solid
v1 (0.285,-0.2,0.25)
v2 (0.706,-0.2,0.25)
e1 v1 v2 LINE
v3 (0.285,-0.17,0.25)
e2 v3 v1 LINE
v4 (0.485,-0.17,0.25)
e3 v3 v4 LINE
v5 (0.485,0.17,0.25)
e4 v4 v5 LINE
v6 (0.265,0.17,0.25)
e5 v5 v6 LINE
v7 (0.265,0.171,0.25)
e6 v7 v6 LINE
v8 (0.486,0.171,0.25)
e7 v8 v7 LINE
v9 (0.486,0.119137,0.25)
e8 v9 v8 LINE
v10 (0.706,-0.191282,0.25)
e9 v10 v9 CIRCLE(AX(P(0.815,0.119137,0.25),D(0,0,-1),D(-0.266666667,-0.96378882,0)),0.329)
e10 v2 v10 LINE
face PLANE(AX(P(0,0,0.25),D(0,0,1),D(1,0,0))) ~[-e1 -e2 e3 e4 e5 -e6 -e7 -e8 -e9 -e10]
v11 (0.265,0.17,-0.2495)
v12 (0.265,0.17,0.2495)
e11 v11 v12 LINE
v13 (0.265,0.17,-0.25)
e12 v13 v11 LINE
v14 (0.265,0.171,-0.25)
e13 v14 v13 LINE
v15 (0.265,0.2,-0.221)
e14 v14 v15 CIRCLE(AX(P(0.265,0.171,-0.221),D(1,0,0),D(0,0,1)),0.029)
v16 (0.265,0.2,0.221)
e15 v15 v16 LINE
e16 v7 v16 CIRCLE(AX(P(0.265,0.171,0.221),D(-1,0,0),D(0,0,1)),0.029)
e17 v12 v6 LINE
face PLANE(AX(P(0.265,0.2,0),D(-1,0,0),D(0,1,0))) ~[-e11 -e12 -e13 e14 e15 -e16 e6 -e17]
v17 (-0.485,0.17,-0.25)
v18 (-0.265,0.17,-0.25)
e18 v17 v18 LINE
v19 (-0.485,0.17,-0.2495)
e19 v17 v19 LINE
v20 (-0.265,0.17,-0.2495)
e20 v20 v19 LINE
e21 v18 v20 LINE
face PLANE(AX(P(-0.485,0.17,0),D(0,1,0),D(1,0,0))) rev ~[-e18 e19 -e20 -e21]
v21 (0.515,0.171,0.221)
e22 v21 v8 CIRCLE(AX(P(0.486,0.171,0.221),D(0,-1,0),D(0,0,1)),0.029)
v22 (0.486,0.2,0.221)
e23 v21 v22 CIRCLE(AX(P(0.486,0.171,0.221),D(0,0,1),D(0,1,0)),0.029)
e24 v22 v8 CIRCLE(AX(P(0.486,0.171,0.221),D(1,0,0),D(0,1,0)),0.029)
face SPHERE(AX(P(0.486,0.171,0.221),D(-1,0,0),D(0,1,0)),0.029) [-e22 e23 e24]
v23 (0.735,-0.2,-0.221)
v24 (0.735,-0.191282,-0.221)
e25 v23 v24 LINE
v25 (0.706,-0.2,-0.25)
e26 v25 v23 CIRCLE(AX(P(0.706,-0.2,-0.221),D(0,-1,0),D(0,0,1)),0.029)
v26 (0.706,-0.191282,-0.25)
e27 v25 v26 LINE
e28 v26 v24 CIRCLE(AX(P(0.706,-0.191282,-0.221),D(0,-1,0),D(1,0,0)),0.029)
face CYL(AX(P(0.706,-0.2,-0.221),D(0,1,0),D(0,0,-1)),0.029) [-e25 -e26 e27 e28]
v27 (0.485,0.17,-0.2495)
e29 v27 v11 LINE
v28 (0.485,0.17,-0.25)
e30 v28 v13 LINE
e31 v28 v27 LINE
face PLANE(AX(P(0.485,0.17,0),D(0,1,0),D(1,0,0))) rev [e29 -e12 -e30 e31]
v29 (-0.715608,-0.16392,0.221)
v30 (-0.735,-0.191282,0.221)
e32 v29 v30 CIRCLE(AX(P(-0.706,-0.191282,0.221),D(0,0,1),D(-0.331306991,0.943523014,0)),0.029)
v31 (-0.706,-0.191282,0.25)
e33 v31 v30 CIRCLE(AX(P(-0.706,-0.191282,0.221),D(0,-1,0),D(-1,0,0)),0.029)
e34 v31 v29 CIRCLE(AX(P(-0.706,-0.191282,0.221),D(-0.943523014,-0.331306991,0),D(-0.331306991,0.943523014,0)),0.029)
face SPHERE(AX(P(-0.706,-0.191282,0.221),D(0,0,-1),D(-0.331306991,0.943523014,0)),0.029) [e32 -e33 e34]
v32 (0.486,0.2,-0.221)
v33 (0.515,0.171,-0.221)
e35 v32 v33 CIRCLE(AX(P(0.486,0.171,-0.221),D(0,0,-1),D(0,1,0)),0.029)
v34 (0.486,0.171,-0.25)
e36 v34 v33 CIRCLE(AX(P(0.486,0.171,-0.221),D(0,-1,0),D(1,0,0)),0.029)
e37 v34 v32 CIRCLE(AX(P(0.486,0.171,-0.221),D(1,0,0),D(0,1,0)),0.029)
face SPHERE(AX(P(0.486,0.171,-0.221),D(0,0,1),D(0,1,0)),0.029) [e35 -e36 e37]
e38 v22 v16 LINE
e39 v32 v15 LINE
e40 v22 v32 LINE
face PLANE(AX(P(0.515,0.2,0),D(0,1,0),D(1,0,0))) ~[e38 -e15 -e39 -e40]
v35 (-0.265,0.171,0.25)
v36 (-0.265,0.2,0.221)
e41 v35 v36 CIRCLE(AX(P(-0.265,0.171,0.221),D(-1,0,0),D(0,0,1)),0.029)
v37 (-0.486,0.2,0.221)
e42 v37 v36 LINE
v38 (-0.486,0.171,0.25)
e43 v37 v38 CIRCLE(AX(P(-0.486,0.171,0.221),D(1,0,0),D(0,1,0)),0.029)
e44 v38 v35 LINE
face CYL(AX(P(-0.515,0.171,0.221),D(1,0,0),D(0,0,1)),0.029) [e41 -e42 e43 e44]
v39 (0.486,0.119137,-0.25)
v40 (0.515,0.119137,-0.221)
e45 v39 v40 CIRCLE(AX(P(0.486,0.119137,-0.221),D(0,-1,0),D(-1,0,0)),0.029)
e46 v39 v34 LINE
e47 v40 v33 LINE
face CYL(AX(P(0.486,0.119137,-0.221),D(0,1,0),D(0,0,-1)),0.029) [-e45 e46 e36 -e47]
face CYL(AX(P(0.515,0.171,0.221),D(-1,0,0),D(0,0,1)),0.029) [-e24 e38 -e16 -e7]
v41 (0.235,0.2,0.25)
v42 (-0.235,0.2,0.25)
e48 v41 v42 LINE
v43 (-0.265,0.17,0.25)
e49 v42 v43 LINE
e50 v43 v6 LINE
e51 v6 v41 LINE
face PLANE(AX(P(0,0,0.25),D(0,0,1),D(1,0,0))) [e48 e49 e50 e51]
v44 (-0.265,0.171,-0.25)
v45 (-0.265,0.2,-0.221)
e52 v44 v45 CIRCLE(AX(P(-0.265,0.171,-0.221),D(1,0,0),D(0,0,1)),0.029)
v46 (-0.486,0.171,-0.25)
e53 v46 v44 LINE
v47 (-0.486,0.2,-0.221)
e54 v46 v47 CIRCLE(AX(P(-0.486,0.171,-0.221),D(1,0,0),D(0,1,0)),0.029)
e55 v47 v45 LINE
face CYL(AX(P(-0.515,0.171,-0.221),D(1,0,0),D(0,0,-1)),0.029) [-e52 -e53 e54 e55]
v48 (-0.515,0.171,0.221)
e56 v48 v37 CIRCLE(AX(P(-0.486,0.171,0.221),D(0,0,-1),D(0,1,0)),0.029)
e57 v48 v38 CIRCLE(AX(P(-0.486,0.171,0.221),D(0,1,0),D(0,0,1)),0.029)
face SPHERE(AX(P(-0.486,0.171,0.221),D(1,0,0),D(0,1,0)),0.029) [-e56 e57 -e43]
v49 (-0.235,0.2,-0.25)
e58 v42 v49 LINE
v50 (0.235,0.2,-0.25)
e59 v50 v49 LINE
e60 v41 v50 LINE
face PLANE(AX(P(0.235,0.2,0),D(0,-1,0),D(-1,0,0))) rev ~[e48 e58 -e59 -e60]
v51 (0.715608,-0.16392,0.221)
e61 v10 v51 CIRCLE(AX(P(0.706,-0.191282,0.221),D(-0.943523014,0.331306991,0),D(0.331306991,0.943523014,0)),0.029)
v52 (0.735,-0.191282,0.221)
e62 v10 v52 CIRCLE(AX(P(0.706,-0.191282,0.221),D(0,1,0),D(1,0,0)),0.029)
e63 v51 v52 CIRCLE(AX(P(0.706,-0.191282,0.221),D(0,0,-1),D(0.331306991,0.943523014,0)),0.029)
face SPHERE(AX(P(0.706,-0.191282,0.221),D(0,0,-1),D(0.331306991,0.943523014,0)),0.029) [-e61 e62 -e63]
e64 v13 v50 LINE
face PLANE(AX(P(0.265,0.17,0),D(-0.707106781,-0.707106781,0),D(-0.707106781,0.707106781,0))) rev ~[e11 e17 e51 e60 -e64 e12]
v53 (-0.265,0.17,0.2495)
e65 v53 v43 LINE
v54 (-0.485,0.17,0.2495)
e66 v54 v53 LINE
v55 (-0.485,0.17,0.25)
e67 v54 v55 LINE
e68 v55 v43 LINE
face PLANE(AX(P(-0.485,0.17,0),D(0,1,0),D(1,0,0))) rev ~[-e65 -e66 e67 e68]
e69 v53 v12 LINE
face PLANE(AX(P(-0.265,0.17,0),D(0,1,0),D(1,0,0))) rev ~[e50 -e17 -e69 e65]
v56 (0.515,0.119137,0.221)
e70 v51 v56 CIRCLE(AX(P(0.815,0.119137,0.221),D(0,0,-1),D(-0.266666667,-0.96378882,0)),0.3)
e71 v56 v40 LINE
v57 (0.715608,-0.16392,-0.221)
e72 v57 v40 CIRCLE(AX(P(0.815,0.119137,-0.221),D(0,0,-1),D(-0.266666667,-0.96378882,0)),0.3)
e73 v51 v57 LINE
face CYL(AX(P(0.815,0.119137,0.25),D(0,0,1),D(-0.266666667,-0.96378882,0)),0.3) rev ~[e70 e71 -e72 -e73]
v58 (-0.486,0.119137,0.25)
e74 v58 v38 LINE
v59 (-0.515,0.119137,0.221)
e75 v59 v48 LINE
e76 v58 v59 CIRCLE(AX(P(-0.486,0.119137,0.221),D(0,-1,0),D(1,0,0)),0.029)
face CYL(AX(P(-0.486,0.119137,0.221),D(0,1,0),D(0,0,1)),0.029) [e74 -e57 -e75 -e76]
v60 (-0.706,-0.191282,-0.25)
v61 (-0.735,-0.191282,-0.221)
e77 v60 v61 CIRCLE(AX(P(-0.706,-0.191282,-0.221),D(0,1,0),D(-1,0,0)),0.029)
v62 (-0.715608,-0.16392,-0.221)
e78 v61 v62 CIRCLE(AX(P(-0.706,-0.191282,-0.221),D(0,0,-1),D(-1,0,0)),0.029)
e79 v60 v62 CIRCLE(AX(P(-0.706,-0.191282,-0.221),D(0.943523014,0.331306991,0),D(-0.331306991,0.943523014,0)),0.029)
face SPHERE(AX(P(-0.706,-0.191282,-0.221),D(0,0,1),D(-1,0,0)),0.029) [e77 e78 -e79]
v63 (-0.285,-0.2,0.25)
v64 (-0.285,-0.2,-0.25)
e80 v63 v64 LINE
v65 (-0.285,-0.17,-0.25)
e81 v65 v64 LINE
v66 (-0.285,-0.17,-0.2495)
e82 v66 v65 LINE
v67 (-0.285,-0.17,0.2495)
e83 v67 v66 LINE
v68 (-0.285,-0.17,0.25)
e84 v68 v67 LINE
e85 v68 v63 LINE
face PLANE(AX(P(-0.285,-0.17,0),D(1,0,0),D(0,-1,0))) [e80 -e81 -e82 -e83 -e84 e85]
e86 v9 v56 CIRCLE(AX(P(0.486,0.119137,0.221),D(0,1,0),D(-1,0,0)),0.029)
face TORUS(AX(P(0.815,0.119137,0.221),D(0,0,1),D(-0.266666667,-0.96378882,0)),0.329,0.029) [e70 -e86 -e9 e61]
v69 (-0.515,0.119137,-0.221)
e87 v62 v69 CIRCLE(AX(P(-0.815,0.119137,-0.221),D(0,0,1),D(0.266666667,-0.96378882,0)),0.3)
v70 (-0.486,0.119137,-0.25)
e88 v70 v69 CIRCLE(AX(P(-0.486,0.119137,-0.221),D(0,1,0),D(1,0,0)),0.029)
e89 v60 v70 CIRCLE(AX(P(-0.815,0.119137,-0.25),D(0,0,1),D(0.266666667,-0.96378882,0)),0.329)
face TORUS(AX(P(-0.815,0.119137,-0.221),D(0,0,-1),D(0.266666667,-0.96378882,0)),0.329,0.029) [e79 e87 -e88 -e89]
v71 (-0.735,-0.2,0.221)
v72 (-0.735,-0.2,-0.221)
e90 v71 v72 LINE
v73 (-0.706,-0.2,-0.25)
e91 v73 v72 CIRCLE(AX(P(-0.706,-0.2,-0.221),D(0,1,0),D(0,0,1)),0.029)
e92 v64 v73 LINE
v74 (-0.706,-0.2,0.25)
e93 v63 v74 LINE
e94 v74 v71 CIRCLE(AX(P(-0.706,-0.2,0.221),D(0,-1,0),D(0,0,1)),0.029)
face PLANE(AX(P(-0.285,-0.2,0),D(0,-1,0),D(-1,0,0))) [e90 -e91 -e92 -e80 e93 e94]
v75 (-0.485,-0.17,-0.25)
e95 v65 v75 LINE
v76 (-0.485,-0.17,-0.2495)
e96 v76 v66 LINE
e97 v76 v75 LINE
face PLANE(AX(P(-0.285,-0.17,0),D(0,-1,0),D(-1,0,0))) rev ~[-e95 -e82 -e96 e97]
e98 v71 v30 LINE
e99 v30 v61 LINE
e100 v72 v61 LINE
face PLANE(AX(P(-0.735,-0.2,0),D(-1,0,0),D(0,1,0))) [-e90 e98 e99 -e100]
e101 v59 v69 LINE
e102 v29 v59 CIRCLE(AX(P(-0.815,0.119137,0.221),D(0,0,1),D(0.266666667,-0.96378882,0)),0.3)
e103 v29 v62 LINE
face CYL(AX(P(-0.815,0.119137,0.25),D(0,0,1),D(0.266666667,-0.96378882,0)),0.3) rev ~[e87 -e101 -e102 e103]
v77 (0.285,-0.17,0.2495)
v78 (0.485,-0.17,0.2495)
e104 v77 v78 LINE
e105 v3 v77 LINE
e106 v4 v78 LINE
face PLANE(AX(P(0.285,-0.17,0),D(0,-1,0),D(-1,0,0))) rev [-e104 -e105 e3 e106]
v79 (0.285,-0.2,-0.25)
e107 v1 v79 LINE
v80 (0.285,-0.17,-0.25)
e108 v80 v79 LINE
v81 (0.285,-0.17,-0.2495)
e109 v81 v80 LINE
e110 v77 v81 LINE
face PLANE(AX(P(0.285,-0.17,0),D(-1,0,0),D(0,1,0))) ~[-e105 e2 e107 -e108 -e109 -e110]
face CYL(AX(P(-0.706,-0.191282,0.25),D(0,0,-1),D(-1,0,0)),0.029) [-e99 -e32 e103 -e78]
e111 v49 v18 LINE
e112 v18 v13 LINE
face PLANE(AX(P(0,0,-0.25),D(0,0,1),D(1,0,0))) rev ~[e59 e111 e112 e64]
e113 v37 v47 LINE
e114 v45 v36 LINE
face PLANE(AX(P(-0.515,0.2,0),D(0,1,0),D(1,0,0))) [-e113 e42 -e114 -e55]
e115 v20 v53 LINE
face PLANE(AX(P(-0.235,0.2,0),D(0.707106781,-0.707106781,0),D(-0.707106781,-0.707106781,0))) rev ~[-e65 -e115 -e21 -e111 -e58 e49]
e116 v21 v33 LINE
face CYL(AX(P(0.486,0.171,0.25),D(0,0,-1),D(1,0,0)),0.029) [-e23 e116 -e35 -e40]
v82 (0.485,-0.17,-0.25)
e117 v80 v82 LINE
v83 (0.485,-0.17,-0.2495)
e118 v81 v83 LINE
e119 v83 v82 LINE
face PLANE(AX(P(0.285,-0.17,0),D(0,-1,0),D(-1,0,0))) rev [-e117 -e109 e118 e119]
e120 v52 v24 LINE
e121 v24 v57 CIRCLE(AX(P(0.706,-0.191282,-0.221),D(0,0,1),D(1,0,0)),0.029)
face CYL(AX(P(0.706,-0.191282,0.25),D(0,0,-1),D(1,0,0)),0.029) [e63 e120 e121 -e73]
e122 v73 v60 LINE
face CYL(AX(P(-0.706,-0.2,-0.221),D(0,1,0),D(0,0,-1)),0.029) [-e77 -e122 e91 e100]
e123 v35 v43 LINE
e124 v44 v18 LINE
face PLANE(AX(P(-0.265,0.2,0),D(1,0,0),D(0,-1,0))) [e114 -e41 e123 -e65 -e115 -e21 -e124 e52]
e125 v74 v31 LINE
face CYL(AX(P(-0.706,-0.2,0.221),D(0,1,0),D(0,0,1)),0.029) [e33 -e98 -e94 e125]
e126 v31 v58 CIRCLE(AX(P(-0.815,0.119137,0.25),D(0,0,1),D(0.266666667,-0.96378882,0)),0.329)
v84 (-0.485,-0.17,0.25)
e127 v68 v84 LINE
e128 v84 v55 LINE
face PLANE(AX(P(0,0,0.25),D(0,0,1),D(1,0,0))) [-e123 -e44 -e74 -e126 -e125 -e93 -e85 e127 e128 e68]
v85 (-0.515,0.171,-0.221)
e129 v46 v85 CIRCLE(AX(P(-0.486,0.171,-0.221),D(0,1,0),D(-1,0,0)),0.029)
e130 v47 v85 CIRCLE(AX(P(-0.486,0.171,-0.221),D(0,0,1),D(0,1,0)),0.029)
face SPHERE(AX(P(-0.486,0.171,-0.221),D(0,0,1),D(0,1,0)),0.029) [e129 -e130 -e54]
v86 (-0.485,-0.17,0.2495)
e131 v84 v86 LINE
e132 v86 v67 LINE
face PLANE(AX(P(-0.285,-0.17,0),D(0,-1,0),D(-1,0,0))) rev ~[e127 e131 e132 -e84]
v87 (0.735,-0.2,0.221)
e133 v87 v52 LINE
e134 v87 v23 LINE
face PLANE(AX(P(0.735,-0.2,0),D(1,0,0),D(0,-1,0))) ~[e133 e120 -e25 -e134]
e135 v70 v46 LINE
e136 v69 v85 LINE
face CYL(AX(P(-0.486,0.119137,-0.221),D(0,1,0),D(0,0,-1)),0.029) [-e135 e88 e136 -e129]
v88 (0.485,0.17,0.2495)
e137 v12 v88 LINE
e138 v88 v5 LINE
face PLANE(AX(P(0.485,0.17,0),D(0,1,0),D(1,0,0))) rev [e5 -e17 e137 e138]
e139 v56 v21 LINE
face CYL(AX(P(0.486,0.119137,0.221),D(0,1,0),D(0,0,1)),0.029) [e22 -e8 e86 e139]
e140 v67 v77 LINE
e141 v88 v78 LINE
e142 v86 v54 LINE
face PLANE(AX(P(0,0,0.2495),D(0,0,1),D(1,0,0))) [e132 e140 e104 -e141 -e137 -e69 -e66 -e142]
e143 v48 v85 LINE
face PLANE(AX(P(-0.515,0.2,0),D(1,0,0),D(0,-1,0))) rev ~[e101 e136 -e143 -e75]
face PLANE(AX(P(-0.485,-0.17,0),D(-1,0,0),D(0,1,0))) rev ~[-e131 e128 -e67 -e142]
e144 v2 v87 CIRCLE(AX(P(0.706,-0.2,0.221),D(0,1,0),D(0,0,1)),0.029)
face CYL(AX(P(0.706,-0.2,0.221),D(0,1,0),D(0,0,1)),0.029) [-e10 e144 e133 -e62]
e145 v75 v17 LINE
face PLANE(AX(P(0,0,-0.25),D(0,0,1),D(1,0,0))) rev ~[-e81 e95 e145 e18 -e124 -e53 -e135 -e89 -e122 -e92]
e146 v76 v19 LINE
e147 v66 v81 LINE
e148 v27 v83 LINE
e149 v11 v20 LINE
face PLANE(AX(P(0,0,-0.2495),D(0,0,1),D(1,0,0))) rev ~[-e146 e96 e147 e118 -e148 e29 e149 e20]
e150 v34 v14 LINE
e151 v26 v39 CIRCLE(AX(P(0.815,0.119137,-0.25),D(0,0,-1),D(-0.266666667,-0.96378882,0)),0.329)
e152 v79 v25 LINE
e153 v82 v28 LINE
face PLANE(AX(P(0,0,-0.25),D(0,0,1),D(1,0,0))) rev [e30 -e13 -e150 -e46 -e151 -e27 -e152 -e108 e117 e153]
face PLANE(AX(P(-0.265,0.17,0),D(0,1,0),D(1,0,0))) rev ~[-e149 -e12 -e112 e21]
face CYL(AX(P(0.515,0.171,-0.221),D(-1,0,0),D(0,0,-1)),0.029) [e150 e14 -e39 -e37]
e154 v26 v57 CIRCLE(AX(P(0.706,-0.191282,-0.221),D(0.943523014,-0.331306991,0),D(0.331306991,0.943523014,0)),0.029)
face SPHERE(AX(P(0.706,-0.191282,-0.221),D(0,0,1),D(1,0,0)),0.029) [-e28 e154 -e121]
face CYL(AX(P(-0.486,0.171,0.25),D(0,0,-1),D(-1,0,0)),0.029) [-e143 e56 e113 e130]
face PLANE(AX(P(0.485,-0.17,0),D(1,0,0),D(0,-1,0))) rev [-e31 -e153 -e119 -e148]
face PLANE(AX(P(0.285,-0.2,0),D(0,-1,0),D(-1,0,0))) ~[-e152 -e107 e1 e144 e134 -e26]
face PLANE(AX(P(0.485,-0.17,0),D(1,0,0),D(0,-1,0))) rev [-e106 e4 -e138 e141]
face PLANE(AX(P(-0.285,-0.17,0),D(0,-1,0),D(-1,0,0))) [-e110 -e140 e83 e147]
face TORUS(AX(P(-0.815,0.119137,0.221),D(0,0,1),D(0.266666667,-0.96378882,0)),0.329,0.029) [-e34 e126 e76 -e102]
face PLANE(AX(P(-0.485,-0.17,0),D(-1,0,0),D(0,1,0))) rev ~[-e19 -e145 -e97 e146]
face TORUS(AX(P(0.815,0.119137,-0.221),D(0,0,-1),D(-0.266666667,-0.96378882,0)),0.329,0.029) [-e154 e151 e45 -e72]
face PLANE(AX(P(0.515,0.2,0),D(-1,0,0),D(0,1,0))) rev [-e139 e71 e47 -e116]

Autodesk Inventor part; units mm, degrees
ref_plane "YZ Plane" through (0, 0, 0) normal (1, 0, 0) x (0, 1, 0)
ref_plane "XZ Plane" through (0, 0, 0) normal (0, 1, 0) x (-1, 0, 0)
ref_plane "XY Plane" through (0, 0, 0) normal (0, 0, 1) x (1, 0, 0)
sketch "Sketch10" plane through (0, 0, 0) normal (0, 0, 1) x (1, 0, 0)
  line L0 (-0.485, 0.17) -> (0.485, 0.17)
  line L1 (0.485, 0.17) -> (0.485, -0.17)
  line L2 (0.485, -0.17) -> (-0.485, -0.17)
  line L3 (-0.485, -0.17) -> (-0.485, 0.17)
  line L4 (-0.265, 0.17) -> (-0.485, 0.17)
  line L5 (-0.515, 0.2) -> (-0.265, 0.2)
  line L6 (-0.265, 0.2) -> (-0.265, 0.17)
  line L7 (-0.515, 0.2) -> (-0.515, -0.17)
  line L8 (-0.485, -0.17) -> (-0.485, 0.17)
  line L9 (-0.285, -0.17) -> (-0.285, -0.2)
  line L10 (-0.285, -0.2) -> (-0.735, -0.2)
  line L11 (-0.735, -0.2) -> (-0.735, -0.17)
  line L12 (-0.735, -0.17) -> (-0.515, -0.17)
  line L13 (-0.485, -0.17) -> (-0.285, -0.17)
  line L14 (-0.265, 0.17) -> (0.265, 0.17)
  line L15 (0.265, 0.17) -> (0.235, 0.2)
  line L16 (0.235, 0.2) -> (-0.235, 0.2)
  line L17 (-0.235, 0.2) -> (-0.265, 0.17)
  point P0 (0, 0)
  point P1 (0, 0.17)
  point P2 (-0.485, 0)
  point P3 (0, 0.2)
  dimension "d11" = 0.2
  dimension "d12" = 0.45
  dimension "d13" = 0.03
  dimension "d14" = 0.03
  dimension "d15" = 0.25
  dimension "d16" = 45
  dimension "d19" = 0.03
  dimension "d21" = 1
  dimension "d22" = 0.4
extrude "Extrusion4" add sketch "Sketch10" along normal mid plane 0.499 contours L0 L1 L2 L3
extrude "Extrusion5" add sketch "Sketch10" along normal mid plane 0.5 contours L3 L2 L9 L10 L11 L12 L7 L5 L6 L0 | L17 L16 L15 L0
fillet "Fillet2" radius 0.3 1 edges at (-0.515, -0.17, 0)
fillet "Fillet3" radius 0.029 10 edges at (-0.39, 0.2, 0.25) (-0.515, 0.2, 0) (-0.39, 0.2, -0.25) (-0.5763, -0.0625, -0.25) (-0.515, 0.1596, -0.25) (-0.5763, -0.0625, 0.25) (-0.515, 0.1596, 0.25) (-0.735, -0.185, 0.25) (-0.735, -0.17, 0) (-0.735, -0.185, -0.25)
mirror "Mirror1" about plane through (0, 0, 0) normal (1, 0, 0) of "Extrusion5", "Fillet2", "Fillet3"
equation "\"d14\" = d13"
equation "\"d19\" = d13"
properties part number "RC0402FR-07330RL Resistor"
